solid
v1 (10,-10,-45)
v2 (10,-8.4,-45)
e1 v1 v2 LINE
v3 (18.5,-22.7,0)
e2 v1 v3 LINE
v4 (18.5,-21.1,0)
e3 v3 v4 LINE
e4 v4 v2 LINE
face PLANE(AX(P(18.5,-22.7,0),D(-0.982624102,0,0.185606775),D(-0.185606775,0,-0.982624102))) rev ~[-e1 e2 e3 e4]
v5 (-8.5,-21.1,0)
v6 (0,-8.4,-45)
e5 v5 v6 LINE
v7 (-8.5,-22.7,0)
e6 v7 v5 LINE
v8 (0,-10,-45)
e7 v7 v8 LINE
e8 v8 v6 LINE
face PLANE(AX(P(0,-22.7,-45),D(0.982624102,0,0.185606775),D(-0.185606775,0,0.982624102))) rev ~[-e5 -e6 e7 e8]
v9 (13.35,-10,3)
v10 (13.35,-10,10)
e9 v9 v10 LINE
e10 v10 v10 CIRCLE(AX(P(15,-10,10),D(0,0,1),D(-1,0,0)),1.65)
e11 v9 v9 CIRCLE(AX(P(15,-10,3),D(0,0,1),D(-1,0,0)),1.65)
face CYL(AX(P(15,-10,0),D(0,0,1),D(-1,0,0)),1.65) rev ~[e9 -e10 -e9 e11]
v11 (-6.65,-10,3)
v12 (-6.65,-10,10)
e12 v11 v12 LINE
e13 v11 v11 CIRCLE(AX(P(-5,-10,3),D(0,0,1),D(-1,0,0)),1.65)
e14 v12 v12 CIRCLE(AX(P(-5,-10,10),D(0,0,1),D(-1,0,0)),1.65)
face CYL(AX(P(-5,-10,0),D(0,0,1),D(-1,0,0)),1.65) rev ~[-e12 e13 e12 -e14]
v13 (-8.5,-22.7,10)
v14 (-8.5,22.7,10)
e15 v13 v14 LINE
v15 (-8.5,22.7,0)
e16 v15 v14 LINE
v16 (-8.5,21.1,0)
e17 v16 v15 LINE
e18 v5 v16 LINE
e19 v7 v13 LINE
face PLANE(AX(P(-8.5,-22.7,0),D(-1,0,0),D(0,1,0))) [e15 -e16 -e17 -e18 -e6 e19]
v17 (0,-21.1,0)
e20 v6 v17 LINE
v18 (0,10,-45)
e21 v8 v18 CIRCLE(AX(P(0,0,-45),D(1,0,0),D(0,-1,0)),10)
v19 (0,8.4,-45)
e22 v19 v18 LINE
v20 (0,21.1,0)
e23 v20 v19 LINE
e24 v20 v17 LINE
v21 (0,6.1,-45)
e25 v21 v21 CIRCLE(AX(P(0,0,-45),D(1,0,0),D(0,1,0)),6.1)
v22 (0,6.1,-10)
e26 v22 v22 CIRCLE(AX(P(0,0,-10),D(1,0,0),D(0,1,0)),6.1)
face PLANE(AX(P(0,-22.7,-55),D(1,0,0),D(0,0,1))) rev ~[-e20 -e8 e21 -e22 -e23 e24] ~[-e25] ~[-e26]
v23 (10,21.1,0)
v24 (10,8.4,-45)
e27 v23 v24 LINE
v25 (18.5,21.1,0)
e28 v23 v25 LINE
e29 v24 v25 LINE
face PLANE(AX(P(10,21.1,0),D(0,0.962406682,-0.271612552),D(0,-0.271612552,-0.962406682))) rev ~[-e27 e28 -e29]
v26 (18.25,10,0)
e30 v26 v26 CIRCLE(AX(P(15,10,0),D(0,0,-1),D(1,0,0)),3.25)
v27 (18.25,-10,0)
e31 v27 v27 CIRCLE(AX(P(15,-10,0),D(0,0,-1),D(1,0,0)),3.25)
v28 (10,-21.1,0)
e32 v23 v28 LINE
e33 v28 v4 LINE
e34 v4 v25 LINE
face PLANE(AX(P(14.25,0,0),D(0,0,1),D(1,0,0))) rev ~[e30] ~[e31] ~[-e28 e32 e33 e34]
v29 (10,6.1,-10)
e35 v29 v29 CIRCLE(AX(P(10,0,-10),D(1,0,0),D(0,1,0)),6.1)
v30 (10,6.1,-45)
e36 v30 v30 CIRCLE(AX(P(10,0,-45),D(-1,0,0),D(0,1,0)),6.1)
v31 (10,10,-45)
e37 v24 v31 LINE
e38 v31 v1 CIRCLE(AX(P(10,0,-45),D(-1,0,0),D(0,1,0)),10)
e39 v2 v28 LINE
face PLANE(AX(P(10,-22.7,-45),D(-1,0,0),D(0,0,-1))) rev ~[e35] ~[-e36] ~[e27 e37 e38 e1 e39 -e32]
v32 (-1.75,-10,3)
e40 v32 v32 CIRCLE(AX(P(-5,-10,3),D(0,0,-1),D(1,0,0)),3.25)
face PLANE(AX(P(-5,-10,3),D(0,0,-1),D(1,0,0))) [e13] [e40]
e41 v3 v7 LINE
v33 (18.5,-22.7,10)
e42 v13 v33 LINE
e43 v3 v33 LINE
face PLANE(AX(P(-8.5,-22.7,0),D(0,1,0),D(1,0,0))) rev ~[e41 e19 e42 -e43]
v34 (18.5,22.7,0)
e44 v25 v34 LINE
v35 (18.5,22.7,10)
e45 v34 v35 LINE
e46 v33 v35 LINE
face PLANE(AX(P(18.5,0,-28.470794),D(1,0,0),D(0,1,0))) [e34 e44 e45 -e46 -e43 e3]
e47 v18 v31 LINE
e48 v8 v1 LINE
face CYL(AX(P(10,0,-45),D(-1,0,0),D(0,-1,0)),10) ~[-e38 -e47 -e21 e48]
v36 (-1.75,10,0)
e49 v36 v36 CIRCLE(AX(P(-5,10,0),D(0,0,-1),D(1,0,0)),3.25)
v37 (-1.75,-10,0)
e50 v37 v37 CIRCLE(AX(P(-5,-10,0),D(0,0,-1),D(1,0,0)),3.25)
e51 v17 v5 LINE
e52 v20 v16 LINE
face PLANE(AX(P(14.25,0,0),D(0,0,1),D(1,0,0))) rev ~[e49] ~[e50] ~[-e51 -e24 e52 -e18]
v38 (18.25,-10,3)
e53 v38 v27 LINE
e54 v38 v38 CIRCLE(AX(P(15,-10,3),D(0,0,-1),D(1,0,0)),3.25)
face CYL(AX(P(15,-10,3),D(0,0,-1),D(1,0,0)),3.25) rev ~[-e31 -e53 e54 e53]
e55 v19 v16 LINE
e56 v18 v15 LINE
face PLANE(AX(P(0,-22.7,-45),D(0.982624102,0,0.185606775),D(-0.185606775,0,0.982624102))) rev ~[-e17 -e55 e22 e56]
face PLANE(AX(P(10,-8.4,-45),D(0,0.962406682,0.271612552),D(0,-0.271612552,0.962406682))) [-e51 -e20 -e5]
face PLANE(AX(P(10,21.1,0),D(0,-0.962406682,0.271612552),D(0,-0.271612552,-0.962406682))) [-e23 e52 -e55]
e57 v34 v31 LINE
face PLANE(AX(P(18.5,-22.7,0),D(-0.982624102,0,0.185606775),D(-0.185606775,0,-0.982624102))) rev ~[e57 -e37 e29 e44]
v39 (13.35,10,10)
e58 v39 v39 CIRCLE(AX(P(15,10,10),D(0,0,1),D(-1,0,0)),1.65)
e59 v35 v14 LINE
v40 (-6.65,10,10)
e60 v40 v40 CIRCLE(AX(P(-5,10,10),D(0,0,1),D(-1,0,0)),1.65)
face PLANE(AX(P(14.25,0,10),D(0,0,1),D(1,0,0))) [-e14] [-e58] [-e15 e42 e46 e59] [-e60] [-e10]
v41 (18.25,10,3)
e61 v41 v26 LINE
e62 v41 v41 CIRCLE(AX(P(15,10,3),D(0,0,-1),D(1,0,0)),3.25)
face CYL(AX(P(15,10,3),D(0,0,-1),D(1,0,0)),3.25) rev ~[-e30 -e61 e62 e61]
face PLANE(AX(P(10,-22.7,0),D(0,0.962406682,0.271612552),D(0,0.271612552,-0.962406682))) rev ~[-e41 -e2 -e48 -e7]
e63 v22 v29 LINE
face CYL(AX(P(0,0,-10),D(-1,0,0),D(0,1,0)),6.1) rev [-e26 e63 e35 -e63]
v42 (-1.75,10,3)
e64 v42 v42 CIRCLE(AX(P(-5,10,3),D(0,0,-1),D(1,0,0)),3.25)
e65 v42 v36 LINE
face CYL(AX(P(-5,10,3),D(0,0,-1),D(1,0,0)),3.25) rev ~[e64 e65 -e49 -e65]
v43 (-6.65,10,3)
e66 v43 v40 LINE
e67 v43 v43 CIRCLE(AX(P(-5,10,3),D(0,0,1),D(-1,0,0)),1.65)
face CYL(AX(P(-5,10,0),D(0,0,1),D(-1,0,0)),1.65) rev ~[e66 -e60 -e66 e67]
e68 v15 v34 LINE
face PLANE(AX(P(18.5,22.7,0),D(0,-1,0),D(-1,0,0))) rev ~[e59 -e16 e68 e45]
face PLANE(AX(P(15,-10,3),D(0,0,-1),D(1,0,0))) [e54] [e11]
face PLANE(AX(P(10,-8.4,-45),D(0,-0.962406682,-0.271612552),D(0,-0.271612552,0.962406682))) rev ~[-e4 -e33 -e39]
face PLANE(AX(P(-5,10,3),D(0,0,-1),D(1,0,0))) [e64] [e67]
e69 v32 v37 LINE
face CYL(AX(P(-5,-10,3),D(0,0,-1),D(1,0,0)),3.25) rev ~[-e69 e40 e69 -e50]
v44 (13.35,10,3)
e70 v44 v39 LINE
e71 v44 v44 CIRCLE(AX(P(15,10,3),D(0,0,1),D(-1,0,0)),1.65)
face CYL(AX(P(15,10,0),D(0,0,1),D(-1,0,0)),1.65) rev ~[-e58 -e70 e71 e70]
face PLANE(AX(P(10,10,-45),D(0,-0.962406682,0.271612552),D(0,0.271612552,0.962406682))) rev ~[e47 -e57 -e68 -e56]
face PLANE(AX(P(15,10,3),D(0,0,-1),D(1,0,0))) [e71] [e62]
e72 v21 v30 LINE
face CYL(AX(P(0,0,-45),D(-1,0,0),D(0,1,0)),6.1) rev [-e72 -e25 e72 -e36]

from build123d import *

# Parameters (mm, degrees)
F0_R           = 6.1
F1_DEPTH       = 10
F2_W           = 8.5
F2_H           = 45.4
F2_W_2         = 10
F3_DEPTH       = 10
F5_D           = 3.3
F5_CBORE_D     = 6.5
F5_CBORE_DEPTH = 3
F7_DEPTH       = 8.5
F7_DEPTH_BACK  = 18.5
F9_DEPTH       = 45.401


with BuildPart() as f1:
    # F0 (on Right) → F1 (new body)
    with BuildSketch(Plane.YZ):
        with BuildLine():
            Line((22.7, 0), (0, 0))
            Line((0, 0), (-22.7, 0))
            Line((-22.7, 0), (-10, -45))
            ThreePointArc((-10, -45), (0, -35), (10, -45))
            Line((10, -45), (22.7, 0))
        make_face()
        with Locations((0, -10)):
            Circle(F0_R, mode=Mode.SUBTRACT)
        with BuildLine():
            ThreePointArc((10, -45), (0, -35), (-10, -45))
            ThreePointArc((-10, -45), (0, -55), (10, -45))
        make_face()
        with Locations((0, -45)):
            Circle(F0_R, mode=Mode.SUBTRACT)
    extrude(amount=F1_DEPTH)

    # F2 (on face) → F3 (join)
    with BuildSketch(Plane.XY):
        with Locations((14.25, 0)):
            Rectangle(F2_W, F2_H)
        with Locations((5, 0)):
            Rectangle(F2_W_2, F2_H)
        with Locations((-4.25, 0)):
            Rectangle(F2_W, F2_H)
    extrude(amount=F3_DEPTH)

    # F5 (through all)
    with Locations(Plane(origin=(0, 0, 0), x_dir=(1, 0, 0), z_dir=(0, 0, -1))):
        with Locations((-5, 10), (15, 10), (15, -10), (-5, -10)):
            CounterBoreHole(F5_D / 2, F5_CBORE_D / 2, F5_CBORE_DEPTH)

    # F6 (on face) → F7 (join, two sides)
    with BuildSketch(Plane.YZ.offset(10)) as f7_sk:
        with BuildLine():
            Line((21.1, 0), (8.4, -45))
            ThreePointArc((8.4, -45), (0, -53.4), (-8.4, -45))
            Line((-8.4, -45), (-21.1, 0))
            Line((-21.1, 0), (-22.7, 0))
            Line((-22.7, 0), (-10, -45))
            ThreePointArc((-10, -45), (0, -55), (10, -45))
            Line((10, -45), (22.7, 0))
            Line((22.7, 0), (21.1, 0))
        make_face()
    extrude(amount=F7_DEPTH)
    extrude(f7_sk.sketch, amount=-F7_DEPTH_BACK)

    # F8 (on face) → F9 (cut, through all)
    with BuildSketch(Plane.XZ.offset(22.7)):
        Polygon((0, -45), (-8.5, 0), (-8.5, -58.9339546859), (18.5, -58.9339546859), (18.5, 0), (10, -45), (10, -55), (0, -55), align=None)
    extrude(amount=-F9_DEPTH, mode=Mode.SUBTRACT)


solid = f1.part
